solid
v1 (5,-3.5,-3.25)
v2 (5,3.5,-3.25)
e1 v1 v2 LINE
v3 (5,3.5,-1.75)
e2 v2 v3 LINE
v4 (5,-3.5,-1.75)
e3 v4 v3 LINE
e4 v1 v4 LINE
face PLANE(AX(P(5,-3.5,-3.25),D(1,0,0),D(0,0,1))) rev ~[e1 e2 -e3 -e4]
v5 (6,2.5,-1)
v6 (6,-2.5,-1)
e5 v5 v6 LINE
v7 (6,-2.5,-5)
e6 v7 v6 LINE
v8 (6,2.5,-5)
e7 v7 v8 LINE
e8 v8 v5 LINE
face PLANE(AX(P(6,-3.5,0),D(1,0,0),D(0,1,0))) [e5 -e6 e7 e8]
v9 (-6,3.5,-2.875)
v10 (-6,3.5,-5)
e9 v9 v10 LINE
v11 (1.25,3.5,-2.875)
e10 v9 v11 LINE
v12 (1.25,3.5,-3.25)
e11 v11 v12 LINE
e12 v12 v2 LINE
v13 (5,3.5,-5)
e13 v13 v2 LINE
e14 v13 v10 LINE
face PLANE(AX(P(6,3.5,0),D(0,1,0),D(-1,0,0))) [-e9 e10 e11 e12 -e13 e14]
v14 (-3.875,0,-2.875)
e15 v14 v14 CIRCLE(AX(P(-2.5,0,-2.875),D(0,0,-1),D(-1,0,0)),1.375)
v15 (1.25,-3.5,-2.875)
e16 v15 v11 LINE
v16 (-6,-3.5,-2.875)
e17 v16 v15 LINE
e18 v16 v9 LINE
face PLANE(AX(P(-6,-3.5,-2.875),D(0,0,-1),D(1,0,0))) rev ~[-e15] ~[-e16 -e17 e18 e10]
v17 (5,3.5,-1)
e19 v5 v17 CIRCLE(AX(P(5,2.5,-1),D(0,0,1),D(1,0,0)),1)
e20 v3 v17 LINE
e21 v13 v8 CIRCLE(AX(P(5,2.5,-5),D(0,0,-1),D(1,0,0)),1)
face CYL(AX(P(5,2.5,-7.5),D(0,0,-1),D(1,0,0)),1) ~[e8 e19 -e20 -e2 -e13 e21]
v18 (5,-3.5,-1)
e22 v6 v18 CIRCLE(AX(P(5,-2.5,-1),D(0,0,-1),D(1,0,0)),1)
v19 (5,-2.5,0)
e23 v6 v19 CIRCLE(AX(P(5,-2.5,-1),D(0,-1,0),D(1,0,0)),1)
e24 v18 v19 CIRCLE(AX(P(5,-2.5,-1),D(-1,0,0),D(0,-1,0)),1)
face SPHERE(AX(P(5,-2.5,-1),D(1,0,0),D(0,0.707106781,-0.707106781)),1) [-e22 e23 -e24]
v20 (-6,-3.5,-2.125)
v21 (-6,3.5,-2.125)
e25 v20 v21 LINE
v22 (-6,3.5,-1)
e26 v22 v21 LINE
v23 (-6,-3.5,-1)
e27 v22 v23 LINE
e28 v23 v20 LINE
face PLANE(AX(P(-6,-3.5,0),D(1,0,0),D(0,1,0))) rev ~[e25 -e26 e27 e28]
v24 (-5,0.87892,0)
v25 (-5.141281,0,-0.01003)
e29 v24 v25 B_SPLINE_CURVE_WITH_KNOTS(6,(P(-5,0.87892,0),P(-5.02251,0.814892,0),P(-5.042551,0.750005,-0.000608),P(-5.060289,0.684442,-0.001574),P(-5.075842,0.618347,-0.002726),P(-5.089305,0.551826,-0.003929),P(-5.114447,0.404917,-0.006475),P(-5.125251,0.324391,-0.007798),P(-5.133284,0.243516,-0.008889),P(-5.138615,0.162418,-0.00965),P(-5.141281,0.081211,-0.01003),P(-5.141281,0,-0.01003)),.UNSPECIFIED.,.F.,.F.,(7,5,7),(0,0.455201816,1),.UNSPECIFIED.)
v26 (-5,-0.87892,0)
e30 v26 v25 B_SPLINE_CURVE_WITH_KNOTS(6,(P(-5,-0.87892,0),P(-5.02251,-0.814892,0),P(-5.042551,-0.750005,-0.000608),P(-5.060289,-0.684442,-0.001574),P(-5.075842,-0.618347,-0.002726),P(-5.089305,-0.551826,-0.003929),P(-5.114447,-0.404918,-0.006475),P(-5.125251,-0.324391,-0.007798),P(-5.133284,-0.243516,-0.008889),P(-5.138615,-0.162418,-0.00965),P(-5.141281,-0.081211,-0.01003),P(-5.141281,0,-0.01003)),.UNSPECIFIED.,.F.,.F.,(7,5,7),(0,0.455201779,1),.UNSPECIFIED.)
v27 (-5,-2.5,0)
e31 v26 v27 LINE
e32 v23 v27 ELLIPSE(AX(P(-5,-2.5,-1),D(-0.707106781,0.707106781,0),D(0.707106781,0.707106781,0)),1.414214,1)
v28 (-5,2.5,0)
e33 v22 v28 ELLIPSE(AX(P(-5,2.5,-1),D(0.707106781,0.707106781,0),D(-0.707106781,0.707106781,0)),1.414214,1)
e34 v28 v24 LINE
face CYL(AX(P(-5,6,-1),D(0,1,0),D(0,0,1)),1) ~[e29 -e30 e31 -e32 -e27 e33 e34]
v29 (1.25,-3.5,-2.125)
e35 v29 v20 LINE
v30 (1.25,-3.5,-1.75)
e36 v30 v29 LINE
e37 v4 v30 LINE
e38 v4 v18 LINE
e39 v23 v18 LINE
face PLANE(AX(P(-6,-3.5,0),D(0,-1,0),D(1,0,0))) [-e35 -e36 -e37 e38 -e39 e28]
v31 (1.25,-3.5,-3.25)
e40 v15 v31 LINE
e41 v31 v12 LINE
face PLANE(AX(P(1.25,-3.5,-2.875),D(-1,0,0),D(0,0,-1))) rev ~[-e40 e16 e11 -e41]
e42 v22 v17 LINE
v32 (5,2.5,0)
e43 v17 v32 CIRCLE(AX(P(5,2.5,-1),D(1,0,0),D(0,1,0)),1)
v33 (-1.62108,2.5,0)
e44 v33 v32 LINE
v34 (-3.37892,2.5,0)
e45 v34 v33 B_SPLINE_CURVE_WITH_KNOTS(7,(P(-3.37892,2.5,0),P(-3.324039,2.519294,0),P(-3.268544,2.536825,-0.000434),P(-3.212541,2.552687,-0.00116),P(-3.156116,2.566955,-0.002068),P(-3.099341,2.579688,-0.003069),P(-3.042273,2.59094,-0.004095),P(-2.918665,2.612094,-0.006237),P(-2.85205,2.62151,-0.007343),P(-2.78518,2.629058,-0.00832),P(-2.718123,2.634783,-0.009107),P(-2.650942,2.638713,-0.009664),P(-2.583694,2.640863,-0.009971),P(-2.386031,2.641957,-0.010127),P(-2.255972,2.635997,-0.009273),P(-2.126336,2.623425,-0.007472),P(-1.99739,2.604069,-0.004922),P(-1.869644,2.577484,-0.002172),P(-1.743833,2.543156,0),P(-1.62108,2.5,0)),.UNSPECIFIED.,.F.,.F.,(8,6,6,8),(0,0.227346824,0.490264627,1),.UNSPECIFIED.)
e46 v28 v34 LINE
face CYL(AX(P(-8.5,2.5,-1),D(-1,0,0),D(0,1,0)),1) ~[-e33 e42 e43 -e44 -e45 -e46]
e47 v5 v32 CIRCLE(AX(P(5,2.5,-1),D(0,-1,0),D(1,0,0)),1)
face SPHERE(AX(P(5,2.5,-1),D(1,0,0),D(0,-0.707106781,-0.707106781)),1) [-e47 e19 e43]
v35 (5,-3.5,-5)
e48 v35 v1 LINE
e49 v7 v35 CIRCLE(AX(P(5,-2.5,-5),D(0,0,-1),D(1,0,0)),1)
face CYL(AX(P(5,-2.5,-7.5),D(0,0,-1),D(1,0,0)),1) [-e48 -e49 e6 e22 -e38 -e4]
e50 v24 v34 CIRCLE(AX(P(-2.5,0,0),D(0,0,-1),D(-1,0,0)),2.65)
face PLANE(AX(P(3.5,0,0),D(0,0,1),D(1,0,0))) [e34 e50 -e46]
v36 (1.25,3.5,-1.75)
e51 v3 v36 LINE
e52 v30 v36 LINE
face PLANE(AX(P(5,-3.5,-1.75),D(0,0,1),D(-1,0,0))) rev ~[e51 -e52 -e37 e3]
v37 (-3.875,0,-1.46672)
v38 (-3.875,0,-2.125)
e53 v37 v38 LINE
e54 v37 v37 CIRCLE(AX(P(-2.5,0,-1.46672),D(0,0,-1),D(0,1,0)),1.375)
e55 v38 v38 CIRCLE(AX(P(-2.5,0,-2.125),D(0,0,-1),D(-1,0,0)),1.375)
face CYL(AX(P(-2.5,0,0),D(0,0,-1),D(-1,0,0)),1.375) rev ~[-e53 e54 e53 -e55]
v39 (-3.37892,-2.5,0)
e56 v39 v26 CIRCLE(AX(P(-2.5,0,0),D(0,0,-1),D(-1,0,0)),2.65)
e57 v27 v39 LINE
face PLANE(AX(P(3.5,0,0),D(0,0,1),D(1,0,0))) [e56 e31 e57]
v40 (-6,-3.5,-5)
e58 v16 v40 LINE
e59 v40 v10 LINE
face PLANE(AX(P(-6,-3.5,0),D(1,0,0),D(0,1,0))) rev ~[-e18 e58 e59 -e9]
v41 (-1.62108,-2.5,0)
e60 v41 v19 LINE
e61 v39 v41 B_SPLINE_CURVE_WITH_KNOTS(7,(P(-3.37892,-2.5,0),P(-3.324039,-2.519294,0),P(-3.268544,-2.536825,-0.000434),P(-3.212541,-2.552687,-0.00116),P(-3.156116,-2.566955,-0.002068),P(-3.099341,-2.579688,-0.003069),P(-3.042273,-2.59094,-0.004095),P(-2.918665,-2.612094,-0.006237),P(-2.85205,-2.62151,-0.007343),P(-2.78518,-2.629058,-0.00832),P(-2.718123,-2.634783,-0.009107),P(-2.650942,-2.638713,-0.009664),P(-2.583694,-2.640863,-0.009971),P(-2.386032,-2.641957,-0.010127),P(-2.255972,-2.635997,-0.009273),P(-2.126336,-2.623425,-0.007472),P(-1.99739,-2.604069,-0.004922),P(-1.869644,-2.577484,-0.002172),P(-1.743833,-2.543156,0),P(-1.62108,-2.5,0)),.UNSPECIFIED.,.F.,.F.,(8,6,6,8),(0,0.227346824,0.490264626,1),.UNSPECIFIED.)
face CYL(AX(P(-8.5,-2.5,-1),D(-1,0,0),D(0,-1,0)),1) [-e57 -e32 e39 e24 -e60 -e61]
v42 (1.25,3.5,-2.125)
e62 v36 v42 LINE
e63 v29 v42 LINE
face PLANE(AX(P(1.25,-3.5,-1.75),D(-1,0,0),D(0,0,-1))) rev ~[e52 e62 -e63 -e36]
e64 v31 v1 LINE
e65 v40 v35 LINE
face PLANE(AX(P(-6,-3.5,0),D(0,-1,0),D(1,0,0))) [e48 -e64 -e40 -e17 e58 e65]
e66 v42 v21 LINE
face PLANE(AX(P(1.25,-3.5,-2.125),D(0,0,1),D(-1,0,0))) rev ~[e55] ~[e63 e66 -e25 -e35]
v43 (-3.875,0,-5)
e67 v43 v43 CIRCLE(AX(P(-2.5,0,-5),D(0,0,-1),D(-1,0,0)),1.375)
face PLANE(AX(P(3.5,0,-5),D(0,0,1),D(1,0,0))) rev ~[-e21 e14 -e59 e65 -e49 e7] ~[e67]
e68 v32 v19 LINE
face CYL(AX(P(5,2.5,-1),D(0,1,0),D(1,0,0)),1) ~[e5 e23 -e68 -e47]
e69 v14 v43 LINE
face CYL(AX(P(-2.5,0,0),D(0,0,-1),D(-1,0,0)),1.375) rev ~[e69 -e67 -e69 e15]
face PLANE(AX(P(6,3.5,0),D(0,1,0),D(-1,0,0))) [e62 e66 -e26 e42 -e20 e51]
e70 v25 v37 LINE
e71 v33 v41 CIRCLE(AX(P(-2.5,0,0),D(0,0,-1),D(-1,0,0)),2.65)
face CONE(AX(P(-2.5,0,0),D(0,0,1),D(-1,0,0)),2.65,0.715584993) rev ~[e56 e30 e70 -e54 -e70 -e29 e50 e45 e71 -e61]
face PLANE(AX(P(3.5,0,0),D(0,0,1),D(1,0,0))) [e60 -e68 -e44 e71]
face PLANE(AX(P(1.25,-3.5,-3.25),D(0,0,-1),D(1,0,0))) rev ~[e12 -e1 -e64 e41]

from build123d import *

# Parameters (mm, degrees)
F0_W           = 5
F0_H           = 7
F0_W_2         = 7
F1_DEPTH       = 5
F3_D           = 2.75
F3_CSINK_D     = 5.3
F3_CSINK_ANGLE = 82
F5_DEPTH       = 7
F6_T1_DEPTH    = 12
F6_T3_DEPTH    = 13.5
F6_T5_DEPTH    = 5
F6_T7_DEPTH    = 6.5
F6_S11_W       = 1
F6_S11_H       = 1
F6_T12_DEPTH   = 1
F6_S17_W       = 1
F6_S17_H       = 1
F6_T18_DEPTH   = 1


# Not quite as in the source:
# - a fillet or chamfer that OpenCascade refuses, or shapes differently, is made with other operations: its cross-section is extruded or revolved along the edge and cut away or added


with BuildPart() as f1:
    # F0 (on Top) → F1 (new body)
    with BuildSketch(Plane.XY):
        with Locations((3.5, 0)):
            Rectangle(F0_W, F0_H)
        with Locations((-2.5, 0)):
            Rectangle(F0_W_2, F0_H)
    extrude(amount=-F1_DEPTH)

    # F3 (through all)
    with Locations(Plane.XY):
        with Locations((-2.5, 0)):
            CounterSinkHole(F3_D / 2, F3_CSINK_D / 2, counter_sink_angle=F3_CSINK_ANGLE)

    # F4 (on face) → F5 (cut, through all)
    with BuildSketch(Plane.XZ.offset(3.5)):
        Polygon((1.25, -3.25), (4.9999998882, -3.25), (4.9999998882, -1.75), (1.25, -1.75), (1.25, -2.125), (-6, -2.125), (-6, -2.875), (1.25, -2.875), align=None)
    extrude(amount=-F5_DEPTH, mode=Mode.SUBTRACT)

    # F6: fillet of radius 1 on 6 edges, made by hand

    # F6_s2 → F6_t1 (cut)
    with BuildSketch(Plane.XZ.offset(-6)):
        with BuildLine():
            ThreePointArc((-5, 0), (-5.7071067812, -0.2928932188), (-6, -1))
            Line((-6, -1), (-6, 0))
            Line((-6, 0), (-5, 0))
        make_face()
    extrude(amount=F6_T1_DEPTH, mode=Mode.SUBTRACT)

    # F6_s4 → F6_t3 (cut)
    with BuildSketch(Plane.YZ.offset(-8.5)):
        with BuildLine():
            ThreePointArc((3.5, -1), (3.2071067812, -0.2928932188), (2.5, 0))
            Line((2.5, 0), (3.5, 0))
            Line((3.5, 0), (3.5, -1))
        make_face()
        with BuildLine():
            ThreePointArc((-3.5, -1), (-3.2071067812, -0.2928932188), (-2.5, 0))
            Line((-2.5, 0), (-3.5, 0))
            Line((-3.5, 0), (-3.5, -1))
        make_face()
    extrude(amount=F6_T3_DEPTH, mode=Mode.SUBTRACT)

    # F6_s6 → F6_t5 (cut)
    with BuildSketch(Plane.XZ.offset(-2.5)):
        with BuildLine():
            ThreePointArc((6, -1), (5.7071067812, -0.2928932188), (5, 0))
            Line((5, 0), (6, 0))
            Line((6, 0), (6, -1))
        make_face()
    extrude(amount=F6_T5_DEPTH, mode=Mode.SUBTRACT)

    # F6_s8 → F6_t7 (cut)
    with BuildSketch(Plane.XY.offset(-7.5)):
        with BuildLine():
            ThreePointArc((6, -2.5), (5.7071067812, -3.2071067812), (5, -3.5))
            Line((5, -3.5), (6, -3.5))
            Line((6, -3.5), (6, -2.5))
        make_face()
        with BuildLine():
            ThreePointArc((6, 2.5), (5.7071067812, 3.2071067812), (5, 3.5))
            Line((5, 3.5), (6, 3.5))
            Line((6, 3.5), (6, 2.5))
        make_face()
    extrude(amount=F6_T7_DEPTH, mode=Mode.SUBTRACT)


with BuildPart() as f6_tool10:
    # F6_s11 → F6_t12 (new body)
    with BuildSketch(Plane.YZ.offset(5)):
        with Locations((3, -0.5)):
            Rectangle(F6_S11_W, F6_S11_H)
    extrude(amount=F6_T12_DEPTH)

    # F6_s13 → F6_t14 (revolve, cut)
    with BuildSketch(Plane(origin=(5, 2.5, -1), x_dir=(0, -0.7071067812, -0.7071067812), z_dir=(0, -0.7071067812, 0.7071067812))):
        with BuildLine():
            ThreePointArc((0, -1), (1, 0), (0, 1))
            Line((0, 1), (0, -1))
        make_face()
    revolve(axis=Axis((5, 2.5, -1), (1, 0, 0)), mode=Mode.SUBTRACT)


with BuildPart() as f1_1:
    add(f1.part)

    # F6_t9: cut F6_tool10
    add(f6_tool10.part, mode=Mode.SUBTRACT)


with BuildPart() as f6_tool16:
    # F6_s17 → F6_t18 (new body)
    with BuildSketch(Plane.YZ.offset(5)):
        with Locations((-3, -0.5)):
            Rectangle(F6_S17_W, F6_S17_H)
    extrude(amount=F6_T18_DEPTH)

    # F6_s19 → F6_t20 (revolve, cut)
    with BuildSketch(Plane(origin=(5, -2.5, -1), x_dir=(0, 0.7071067812, -0.7071067812), z_dir=(0, -0.7071067812, -0.7071067812))):
        with BuildLine():
            ThreePointArc((0, -1), (1, 0), (0, 1))
            Line((0, 1), (0, -1))
        make_face()
    revolve(axis=Axis((5, -2.5, -1), (1, 0, 0)), mode=Mode.SUBTRACT)


with BuildPart() as f1_2:
    add(f1_1.part)

    # F6_t15: cut F6_tool16
    add(f6_tool16.part, mode=Mode.SUBTRACT)


solid = f1_2.part
